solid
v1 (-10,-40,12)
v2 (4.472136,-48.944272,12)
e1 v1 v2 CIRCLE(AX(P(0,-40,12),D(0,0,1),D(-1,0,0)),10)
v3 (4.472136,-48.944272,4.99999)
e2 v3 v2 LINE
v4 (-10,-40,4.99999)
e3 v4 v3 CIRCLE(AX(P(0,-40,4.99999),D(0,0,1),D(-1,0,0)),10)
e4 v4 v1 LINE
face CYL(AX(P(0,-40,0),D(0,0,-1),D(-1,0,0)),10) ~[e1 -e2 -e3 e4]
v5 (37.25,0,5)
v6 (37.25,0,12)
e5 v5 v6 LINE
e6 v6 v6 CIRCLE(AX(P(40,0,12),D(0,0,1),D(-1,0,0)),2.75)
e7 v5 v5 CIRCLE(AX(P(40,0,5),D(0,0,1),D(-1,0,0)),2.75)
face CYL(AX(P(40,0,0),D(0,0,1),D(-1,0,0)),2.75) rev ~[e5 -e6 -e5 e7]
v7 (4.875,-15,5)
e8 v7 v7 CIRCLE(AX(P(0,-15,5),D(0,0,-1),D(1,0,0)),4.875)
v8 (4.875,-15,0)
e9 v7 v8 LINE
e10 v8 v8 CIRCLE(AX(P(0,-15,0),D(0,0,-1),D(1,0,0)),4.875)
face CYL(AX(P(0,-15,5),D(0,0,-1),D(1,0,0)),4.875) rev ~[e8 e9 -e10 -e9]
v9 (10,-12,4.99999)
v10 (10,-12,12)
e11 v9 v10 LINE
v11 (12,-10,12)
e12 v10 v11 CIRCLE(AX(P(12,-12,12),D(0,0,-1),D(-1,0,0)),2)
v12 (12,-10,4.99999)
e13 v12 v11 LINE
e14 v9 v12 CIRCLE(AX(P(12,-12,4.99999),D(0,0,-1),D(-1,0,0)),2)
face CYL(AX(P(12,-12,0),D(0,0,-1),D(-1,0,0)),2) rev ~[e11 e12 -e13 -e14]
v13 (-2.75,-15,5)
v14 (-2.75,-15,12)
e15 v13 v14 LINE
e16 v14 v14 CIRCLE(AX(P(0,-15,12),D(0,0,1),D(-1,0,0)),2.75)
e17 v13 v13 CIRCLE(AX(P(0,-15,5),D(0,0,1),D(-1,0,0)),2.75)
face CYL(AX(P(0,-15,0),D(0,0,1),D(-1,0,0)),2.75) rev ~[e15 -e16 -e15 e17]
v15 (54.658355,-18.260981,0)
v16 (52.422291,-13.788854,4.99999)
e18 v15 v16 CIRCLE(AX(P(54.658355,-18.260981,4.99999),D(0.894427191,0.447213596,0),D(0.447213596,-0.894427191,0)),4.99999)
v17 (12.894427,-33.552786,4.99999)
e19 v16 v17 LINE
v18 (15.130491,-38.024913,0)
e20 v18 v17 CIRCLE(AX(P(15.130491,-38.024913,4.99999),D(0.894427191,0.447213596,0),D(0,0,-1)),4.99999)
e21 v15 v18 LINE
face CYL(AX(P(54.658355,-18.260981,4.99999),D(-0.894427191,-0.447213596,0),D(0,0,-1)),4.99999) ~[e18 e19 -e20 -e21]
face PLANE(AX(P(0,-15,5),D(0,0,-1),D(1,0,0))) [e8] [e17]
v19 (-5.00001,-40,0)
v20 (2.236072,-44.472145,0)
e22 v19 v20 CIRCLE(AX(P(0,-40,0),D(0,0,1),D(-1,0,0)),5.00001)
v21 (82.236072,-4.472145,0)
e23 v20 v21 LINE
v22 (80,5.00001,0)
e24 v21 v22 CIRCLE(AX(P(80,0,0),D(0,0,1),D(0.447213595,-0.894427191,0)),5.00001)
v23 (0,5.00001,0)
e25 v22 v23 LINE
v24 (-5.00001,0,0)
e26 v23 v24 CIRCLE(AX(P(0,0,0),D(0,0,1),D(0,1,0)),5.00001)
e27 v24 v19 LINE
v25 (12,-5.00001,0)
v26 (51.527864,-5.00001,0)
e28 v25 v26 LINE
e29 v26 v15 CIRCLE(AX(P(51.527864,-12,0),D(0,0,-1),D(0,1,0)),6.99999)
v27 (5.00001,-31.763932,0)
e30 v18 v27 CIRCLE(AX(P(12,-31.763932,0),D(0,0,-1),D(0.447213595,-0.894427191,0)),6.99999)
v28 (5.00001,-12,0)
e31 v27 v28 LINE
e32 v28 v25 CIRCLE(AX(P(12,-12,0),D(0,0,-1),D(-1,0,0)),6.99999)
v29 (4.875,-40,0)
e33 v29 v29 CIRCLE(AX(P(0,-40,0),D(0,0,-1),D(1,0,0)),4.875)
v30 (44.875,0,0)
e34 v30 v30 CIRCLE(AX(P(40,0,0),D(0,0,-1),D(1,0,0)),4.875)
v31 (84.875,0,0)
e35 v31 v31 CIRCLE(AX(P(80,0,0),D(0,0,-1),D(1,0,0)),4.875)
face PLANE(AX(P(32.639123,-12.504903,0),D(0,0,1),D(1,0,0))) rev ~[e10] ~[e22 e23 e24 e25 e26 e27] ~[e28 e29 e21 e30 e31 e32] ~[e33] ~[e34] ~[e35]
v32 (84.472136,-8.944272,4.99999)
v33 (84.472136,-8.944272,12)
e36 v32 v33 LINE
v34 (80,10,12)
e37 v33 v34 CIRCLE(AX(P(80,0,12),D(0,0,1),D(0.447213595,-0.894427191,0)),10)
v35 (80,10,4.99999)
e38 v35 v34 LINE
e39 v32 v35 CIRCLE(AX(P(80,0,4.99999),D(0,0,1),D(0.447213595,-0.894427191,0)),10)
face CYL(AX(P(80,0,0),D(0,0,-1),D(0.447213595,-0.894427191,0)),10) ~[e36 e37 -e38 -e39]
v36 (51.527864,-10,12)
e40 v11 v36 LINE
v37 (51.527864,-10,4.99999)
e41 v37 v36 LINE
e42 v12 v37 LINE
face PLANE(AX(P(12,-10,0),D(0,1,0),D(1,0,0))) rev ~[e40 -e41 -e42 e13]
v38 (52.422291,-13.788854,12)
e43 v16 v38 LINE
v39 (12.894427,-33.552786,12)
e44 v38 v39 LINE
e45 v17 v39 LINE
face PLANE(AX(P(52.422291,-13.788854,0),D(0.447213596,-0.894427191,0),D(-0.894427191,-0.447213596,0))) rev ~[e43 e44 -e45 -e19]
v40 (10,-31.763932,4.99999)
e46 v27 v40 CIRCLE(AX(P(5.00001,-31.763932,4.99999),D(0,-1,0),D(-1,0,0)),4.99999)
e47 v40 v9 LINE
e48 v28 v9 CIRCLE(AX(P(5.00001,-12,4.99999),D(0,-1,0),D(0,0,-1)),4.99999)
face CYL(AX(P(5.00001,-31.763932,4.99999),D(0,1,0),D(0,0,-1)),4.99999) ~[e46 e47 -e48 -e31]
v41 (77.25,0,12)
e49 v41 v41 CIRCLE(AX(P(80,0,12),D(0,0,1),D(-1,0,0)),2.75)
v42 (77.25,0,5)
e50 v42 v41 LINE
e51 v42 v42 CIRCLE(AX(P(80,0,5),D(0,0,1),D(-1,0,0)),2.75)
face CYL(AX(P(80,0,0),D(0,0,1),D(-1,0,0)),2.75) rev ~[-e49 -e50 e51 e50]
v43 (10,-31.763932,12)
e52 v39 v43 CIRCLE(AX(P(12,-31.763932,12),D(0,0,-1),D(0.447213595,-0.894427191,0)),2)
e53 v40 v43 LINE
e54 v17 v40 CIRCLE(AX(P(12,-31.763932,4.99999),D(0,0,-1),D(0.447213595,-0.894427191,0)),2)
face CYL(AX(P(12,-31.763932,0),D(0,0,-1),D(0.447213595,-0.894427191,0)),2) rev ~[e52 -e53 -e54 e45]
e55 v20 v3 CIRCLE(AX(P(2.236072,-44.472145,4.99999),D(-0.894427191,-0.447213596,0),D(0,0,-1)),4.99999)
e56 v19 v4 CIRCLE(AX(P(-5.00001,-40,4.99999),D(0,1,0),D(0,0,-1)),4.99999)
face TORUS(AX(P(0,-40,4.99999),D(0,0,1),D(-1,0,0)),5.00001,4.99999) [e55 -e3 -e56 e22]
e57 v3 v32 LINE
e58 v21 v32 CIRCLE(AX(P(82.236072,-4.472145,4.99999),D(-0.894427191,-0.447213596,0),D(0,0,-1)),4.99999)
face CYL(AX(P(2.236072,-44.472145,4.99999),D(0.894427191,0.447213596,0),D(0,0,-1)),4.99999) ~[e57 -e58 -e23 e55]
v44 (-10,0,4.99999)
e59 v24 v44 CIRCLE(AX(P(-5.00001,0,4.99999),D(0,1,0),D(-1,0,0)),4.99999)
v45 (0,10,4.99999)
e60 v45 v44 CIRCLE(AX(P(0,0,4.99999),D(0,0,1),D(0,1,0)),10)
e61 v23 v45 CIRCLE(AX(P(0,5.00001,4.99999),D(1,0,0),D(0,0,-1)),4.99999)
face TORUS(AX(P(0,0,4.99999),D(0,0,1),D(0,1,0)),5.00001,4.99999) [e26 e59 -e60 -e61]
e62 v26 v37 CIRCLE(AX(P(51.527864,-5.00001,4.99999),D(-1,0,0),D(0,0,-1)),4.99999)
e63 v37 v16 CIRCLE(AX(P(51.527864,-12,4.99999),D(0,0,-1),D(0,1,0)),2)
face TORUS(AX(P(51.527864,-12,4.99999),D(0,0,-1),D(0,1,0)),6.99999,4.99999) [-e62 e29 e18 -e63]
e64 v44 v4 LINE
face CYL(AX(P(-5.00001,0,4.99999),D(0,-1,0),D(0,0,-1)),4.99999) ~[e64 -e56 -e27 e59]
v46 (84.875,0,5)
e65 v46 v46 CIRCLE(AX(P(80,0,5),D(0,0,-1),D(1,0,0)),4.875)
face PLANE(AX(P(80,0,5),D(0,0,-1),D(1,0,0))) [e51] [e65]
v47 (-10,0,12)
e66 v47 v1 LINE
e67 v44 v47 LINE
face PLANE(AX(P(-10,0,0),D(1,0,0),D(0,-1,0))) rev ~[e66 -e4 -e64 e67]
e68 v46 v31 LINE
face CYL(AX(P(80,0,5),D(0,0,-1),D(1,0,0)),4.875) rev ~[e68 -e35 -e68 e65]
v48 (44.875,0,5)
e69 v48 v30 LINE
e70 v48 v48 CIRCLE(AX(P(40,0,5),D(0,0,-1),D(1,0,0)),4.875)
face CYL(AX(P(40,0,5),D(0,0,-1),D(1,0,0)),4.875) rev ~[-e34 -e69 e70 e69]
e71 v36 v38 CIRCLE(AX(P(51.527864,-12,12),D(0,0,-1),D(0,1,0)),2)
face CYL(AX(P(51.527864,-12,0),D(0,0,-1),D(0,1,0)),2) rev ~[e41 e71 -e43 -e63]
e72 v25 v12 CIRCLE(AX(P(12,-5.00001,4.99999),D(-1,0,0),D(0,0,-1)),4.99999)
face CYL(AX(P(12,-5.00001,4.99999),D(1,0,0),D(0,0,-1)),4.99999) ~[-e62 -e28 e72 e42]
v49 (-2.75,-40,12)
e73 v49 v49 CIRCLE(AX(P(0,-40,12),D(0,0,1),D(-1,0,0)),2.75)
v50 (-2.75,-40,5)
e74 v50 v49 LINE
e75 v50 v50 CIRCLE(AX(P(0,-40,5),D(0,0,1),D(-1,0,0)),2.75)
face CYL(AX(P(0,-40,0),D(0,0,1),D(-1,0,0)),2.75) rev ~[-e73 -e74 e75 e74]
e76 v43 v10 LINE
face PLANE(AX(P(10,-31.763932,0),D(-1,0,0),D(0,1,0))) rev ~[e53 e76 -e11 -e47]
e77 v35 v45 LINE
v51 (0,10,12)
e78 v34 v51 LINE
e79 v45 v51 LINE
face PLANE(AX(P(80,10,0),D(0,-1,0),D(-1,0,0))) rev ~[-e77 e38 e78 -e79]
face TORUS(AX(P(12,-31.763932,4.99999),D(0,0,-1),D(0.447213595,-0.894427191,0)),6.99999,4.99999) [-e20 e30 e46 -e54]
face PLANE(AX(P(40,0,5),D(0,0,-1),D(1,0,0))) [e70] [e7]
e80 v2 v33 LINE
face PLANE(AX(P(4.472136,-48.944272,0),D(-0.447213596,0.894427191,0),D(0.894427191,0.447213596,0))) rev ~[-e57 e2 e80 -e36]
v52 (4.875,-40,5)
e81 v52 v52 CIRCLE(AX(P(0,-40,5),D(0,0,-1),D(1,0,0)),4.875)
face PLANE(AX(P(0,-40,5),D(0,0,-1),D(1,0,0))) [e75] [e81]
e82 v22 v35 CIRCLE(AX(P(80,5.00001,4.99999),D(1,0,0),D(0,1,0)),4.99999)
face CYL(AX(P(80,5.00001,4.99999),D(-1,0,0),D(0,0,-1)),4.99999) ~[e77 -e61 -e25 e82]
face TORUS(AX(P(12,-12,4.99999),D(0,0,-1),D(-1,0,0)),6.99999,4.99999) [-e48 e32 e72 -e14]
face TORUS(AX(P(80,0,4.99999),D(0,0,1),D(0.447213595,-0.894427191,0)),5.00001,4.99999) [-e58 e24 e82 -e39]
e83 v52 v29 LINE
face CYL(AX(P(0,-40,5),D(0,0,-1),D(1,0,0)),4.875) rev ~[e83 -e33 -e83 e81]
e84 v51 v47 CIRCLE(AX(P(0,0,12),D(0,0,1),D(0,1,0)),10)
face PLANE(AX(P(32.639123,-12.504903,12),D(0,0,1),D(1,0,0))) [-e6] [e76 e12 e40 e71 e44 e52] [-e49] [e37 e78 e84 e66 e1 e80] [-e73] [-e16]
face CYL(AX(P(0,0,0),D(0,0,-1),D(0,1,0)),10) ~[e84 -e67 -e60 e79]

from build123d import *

# Parameters (mm, degrees)
F1_DEPTH       = 12
F2_D           = 5.5
F2_CBORE_D     = 9.75
F2_CBORE_DEPTH = 5
F3_R           = 4.99999


# Not quite as in the source:
# - a fillet or chamfer is up to 0.001 mm smaller than in the source, because OpenCascade refuses the exact size


with BuildPart() as f1:
    # F0 (on Top) → F1 (new body)
    with BuildSketch(Plane.XY):
        with BuildLine():
            Line((80, 10), (0, 10))
            ThreePointArc((0, 10), (-7.0710678119, 7.0710678119), (-10, 0))
            Line((-10, 0), (-10, -40))
            ThreePointArc((-10, -40), (-5.2573111212, -48.5065080835), (4.472135955, -48.94427191))
            Line((4.472135955, -48.94427191), (84.472135955, -8.94427191))
            ThreePointArc((84.472135955, -8.94427191), (89.7324898947, 2.2975292055), (80, 10))
        make_face()
        with BuildLine():
            ThreePointArc((51.527864045, -10), (53.4743620239, -11.5404941589), (52.422291236, -13.788854382))
            Line((52.422291236, -13.788854382), (12.894427191, -33.5527864045))
            ThreePointArc((12.894427191, -33.5527864045), (10.9485377758, -33.4652336392), (10, -31.7639320225))
            Line((10, -31.7639320225), (10, -12))
            ThreePointArc((10, -12), (10.5857864376, -10.5857864376), (12, -10))
            Line((12, -10), (51.527864045, -10))
        make_face(mode=Mode.SUBTRACT)
    extrude(amount=F1_DEPTH)

    # F2 (through all)
    with Locations(Plane(origin=(0, 0, 0), x_dir=(1, 0, 0), z_dir=(0, 0, -1))):
        with Locations((80, 0), (0, 40), (40, 0), (0, 15)):
            CounterBoreHole(F2_D / 2, F2_CBORE_D / 2, F2_CBORE_DEPTH)

    # F3 (radius 5 in the source; OpenCascade refuses exactly that, so slightly less here)
    f3_edges = [f1.edges().sort_by_distance(p)[0] for p in [
        (44.472136, -28.944272, 0),
        (31.763932, -10, 0),
    ]]
    fillet(f3_edges, radius=F3_R)


solid = f1.part
